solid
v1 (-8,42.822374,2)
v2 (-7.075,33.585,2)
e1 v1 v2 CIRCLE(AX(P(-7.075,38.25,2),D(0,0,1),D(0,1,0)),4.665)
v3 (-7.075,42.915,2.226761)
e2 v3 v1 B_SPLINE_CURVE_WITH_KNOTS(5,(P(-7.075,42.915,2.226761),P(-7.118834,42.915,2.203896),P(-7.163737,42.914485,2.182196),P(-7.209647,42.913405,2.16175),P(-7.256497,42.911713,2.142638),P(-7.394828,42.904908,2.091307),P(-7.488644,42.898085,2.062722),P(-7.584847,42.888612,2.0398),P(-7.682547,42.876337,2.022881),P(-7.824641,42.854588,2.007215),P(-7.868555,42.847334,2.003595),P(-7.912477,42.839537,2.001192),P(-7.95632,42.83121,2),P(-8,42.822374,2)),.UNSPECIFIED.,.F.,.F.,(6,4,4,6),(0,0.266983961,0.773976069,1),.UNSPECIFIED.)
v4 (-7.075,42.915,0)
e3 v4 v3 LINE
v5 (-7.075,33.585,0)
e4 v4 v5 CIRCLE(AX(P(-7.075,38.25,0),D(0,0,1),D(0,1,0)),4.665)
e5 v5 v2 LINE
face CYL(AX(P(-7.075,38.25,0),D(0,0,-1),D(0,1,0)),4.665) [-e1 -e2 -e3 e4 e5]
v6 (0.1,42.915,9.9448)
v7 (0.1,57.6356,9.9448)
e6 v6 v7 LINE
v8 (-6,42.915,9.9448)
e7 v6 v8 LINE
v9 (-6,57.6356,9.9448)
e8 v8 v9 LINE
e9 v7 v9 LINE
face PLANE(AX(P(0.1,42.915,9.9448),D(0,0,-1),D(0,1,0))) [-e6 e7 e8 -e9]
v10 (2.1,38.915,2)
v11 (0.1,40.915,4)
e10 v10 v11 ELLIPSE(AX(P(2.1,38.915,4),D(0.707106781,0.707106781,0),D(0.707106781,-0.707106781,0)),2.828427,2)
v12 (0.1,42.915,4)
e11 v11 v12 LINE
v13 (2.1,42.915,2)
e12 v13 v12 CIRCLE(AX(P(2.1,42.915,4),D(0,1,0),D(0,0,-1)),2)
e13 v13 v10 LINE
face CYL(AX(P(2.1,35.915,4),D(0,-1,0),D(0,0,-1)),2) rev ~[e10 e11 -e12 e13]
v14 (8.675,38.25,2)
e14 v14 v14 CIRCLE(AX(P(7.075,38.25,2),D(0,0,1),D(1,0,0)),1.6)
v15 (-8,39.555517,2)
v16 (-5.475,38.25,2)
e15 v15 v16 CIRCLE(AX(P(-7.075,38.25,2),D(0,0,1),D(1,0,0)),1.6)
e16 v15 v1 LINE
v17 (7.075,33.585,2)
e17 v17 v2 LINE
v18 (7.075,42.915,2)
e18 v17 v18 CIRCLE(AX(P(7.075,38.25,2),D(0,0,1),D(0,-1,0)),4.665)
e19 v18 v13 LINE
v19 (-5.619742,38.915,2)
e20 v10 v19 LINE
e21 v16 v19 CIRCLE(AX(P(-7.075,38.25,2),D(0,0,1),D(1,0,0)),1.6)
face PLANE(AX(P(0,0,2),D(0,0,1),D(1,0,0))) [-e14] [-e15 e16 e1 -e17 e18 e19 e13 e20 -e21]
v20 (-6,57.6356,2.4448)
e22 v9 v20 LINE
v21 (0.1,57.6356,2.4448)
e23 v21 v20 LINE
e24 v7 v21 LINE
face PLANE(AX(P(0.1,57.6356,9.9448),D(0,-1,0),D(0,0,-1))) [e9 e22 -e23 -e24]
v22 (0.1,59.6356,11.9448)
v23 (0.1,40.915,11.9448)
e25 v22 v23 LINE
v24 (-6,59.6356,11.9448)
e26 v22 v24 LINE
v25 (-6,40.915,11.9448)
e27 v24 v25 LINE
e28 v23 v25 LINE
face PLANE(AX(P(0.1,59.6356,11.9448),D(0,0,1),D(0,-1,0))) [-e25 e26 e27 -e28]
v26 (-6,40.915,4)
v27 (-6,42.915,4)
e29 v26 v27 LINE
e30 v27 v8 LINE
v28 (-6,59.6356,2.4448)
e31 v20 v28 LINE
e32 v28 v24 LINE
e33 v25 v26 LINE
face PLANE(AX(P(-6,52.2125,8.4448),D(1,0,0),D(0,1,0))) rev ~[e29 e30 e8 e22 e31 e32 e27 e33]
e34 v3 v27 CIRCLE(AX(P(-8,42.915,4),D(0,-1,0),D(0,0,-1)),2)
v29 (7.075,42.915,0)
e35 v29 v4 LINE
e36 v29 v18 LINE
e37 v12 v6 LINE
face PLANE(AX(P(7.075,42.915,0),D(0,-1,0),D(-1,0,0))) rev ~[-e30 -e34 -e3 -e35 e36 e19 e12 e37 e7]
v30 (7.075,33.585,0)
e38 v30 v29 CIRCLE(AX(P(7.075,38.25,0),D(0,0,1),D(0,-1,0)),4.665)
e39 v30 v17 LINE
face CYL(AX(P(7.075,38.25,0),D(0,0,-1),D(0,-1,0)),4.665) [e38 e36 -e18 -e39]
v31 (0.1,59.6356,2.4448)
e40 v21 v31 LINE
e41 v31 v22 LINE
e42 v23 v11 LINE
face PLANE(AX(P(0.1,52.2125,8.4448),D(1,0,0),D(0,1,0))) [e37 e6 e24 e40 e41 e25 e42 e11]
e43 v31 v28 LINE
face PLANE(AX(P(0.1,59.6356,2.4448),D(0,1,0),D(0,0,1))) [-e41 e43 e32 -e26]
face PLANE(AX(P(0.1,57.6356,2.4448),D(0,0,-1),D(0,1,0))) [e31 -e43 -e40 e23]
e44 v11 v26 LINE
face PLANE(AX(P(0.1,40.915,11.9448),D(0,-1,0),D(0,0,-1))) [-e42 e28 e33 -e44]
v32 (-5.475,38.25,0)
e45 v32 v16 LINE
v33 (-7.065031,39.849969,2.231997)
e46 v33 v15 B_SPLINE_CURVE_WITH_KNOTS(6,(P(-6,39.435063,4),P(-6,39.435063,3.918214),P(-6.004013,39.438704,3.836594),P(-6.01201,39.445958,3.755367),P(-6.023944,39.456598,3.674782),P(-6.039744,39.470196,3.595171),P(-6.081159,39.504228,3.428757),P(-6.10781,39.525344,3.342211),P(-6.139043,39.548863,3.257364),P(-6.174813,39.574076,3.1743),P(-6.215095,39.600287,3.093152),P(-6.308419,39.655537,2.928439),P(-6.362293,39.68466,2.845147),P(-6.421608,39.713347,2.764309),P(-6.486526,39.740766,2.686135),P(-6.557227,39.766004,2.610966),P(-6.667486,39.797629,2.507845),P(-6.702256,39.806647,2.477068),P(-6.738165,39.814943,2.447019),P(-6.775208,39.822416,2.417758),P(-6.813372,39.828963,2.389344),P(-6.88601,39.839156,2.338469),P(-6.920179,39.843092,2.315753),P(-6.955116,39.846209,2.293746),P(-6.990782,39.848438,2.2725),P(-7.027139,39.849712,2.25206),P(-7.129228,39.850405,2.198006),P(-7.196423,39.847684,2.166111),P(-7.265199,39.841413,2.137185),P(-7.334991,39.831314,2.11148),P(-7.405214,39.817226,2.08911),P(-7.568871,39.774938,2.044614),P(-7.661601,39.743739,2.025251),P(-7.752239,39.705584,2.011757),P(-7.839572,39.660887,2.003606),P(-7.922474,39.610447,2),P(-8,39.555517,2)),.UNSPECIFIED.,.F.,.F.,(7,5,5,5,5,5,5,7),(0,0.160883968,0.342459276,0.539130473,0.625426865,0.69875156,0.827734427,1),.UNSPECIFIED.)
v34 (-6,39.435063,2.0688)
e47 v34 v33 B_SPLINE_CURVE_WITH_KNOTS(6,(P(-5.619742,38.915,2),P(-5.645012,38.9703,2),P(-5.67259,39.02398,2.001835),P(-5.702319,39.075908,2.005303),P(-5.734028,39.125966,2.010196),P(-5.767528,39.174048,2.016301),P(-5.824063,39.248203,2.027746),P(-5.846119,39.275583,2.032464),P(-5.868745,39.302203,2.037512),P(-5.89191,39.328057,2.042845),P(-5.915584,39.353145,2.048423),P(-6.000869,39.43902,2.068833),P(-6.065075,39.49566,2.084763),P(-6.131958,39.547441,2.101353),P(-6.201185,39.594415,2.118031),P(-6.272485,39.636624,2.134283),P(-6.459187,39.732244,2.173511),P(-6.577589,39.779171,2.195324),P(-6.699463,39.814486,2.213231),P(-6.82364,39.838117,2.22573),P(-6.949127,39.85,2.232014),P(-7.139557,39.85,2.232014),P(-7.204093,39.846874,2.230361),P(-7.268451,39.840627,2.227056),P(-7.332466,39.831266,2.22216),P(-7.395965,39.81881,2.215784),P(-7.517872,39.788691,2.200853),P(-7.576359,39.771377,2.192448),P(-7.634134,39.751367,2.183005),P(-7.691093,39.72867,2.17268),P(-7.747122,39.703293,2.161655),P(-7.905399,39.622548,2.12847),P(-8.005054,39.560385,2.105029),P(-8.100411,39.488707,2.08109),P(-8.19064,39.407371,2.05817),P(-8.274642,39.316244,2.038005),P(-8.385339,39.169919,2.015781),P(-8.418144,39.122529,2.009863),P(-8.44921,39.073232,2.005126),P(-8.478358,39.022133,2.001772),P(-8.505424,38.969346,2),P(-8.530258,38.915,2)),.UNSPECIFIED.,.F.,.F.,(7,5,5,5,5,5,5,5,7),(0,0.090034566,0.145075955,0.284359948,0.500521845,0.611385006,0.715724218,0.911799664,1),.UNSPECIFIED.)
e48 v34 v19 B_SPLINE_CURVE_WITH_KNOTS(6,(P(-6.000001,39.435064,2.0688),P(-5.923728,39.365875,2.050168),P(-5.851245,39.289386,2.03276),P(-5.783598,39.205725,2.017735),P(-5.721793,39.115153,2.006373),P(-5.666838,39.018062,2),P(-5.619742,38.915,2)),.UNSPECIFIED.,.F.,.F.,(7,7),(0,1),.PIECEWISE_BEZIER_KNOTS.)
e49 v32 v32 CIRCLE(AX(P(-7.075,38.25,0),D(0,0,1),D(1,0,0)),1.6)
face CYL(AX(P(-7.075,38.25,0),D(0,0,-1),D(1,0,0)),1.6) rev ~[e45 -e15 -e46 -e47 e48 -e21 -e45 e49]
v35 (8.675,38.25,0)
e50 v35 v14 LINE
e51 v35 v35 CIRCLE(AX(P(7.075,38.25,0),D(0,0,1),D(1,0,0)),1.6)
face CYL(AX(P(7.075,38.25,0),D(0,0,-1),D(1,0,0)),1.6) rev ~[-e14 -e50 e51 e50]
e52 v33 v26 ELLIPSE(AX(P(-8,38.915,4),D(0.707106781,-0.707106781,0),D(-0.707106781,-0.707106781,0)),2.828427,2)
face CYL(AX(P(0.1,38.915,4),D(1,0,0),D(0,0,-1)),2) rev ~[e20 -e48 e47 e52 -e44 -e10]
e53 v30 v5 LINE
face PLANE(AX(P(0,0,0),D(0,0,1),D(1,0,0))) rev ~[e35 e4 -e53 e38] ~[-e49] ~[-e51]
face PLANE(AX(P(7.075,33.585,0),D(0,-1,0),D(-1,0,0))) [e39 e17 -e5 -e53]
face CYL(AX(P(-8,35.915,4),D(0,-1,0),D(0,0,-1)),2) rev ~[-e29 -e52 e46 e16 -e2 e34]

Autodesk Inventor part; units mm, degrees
ref_plane "工作平面1" through (0, 0, 0) normal (0, 0, 1) x (1, 0, 0)
sketch "草圖1" plane through (0, 0, 0) normal (0, 0, 1) x (1, 0, 0)
  circle A0 centre (-7.075, 38.25) radius 2.165 projected
  circle A1 centre (7.075, 38.25) radius 2.165 projected
  arc A2 (-15.075, -26.25) -> (-13.075, -28.25) centre (-13.075, -26.25) ccw projected
  line L0 (-13.075, -28.25) -> (13.075, -28.25) projected
  arc A3 (13.075, -28.25) -> (15.075, -26.25) centre (13.075, -26.25) ccw projected
  line L1 (15.075, -26.25) -> (15.075, 43.25) construction
  line L2 (-15.075, 43.25) -> (15.075, 43.25) construction
  line L3 (-15.075, 43.25) -> (-15.075, -26.25) construction
  line L4 (-10.075, 23.25) -> (10.075, 23.25) projected
  line L5 (10.075, 23.25) -> (10.075, 3.1) projected
  line L6 (10.075, 3.1) -> (-10.075, 3.1) projected
  line L7 (-10.075, 3.1) -> (-10.075, 23.25) projected
  line L8 (-10.075, -3.1) -> (10.075, -3.1) projected
  line L9 (10.075, -3.1) -> (10.075, -23.25) projected
  line L10 (10.075, -23.25) -> (-10.075, -23.25) projected
  line L11 (-10.075, -23.25) -> (-10.075, -3.1) projected
  arc A4 (7.075, 33.585) -> (7.075, 42.915) centre (7.075, 38.25) ccw
  arc A5 (-7.075, 42.915) -> (-7.075, 33.585) centre (-7.075, 38.25) ccw
  line L12 (7.075, 33.585) -> (-7.075, 33.585)
  line L13 (7.075, 42.915) -> (-7.075, 42.915)
  circle A6 centre (7.075, 38.25) radius 1.6
  circle A7 centre (-7.075, 38.25) radius 1.6
  point P0 (0, 0)
  dimension "d0" = 2.5
  dimension "d1" = 2.5
  dimension "d20" = 3.2
  dimension "d21" = 3.2
extrude "擠出1" add sketch "草圖1" along normal blind 2 contours A0 | A1 | L12 A5 L13 A4
ref_plane "工作平面3" through (-5.8702, 48.2125, -2.9174) normal (-0.9999955, 0, 0.0030077) x (0.0030077, 0, 0.9999955)
ref_plane "工作平面4" through (0.1, 52.2125, 8.4448) normal (1, 0, 0) x (0, 1, 0)
sketch "草圖3" plane through (0.1, 52.2125, 8.4448) normal (1, 0, 0) x (0, 1, 0)
  line L0 (-18.6275, -8.4448) -> (-9.2975, -8.4448) projected
  line L1 (-9.2975, -8.4448) -> (-9.2975, -6.4448) projected
  line L2 (-18.6275, -6.4448) -> (-9.2975, -6.4448) projected
  line L3 (-18.6275, -8.4448) -> (-18.6275, -6.4448) projected
  line L4 (4, -7.96) -> (4, 0) projected
  line L5 (4, 0) -> (0, 0) projected
  line L6 (0, 0) -> (0, -9.8) projected
  line L7 (12.94, -9.8) -> (0, -9.8) projected
  line L8 (12.94, -9.8) -> (12.94, 0) projected
  line L9 (12.94, 0) -> (8.94, 0) projected
  line L10 (8.94, 0) -> (8.94, -7.96) projected
  line L11 (8.94, -7.96) -> (4, -7.96) projected
  line L12 (-9.2975, -6.4448) -> (-9.2975, 1.5)
  line L13 (-9.2975, 1.5) -> (5.4231, 1.5)
  line L14 (5.4231, 1.5) -> (5.4231, -6)
  line L15 (5.4231, -6) -> (7.4231, -6)
  line L16 (7.4231, -6) -> (7.4231, 3.5)
  line L17 (7.4231, 3.5) -> (-11.2975, 3.5)
  line L18 (-11.2975, 3.5) -> (-11.2975, -6.4448)
  point P0 (-52.2125, -8.4448)
  point P1 (-9.2975, 3.5)
  dimension "d12" = 2
  dimension "d13" = 2
  dimension "d14" = 2
  dimension "d15" = 1.5
  dimension "d16" = 7.5
extrude "擠出3" add sketch "草圖3" against normal blind 6.1 contours L2 L18 L17 L16 L15 L14 L13 L12
fillet "圓角1" radius 2 3 edges at (0.1, 41.915, 2) (-2.95, 40.915, 2) (-6, 41.915, 2)
properties part number "j3 endstop blocker_3D 列印"
